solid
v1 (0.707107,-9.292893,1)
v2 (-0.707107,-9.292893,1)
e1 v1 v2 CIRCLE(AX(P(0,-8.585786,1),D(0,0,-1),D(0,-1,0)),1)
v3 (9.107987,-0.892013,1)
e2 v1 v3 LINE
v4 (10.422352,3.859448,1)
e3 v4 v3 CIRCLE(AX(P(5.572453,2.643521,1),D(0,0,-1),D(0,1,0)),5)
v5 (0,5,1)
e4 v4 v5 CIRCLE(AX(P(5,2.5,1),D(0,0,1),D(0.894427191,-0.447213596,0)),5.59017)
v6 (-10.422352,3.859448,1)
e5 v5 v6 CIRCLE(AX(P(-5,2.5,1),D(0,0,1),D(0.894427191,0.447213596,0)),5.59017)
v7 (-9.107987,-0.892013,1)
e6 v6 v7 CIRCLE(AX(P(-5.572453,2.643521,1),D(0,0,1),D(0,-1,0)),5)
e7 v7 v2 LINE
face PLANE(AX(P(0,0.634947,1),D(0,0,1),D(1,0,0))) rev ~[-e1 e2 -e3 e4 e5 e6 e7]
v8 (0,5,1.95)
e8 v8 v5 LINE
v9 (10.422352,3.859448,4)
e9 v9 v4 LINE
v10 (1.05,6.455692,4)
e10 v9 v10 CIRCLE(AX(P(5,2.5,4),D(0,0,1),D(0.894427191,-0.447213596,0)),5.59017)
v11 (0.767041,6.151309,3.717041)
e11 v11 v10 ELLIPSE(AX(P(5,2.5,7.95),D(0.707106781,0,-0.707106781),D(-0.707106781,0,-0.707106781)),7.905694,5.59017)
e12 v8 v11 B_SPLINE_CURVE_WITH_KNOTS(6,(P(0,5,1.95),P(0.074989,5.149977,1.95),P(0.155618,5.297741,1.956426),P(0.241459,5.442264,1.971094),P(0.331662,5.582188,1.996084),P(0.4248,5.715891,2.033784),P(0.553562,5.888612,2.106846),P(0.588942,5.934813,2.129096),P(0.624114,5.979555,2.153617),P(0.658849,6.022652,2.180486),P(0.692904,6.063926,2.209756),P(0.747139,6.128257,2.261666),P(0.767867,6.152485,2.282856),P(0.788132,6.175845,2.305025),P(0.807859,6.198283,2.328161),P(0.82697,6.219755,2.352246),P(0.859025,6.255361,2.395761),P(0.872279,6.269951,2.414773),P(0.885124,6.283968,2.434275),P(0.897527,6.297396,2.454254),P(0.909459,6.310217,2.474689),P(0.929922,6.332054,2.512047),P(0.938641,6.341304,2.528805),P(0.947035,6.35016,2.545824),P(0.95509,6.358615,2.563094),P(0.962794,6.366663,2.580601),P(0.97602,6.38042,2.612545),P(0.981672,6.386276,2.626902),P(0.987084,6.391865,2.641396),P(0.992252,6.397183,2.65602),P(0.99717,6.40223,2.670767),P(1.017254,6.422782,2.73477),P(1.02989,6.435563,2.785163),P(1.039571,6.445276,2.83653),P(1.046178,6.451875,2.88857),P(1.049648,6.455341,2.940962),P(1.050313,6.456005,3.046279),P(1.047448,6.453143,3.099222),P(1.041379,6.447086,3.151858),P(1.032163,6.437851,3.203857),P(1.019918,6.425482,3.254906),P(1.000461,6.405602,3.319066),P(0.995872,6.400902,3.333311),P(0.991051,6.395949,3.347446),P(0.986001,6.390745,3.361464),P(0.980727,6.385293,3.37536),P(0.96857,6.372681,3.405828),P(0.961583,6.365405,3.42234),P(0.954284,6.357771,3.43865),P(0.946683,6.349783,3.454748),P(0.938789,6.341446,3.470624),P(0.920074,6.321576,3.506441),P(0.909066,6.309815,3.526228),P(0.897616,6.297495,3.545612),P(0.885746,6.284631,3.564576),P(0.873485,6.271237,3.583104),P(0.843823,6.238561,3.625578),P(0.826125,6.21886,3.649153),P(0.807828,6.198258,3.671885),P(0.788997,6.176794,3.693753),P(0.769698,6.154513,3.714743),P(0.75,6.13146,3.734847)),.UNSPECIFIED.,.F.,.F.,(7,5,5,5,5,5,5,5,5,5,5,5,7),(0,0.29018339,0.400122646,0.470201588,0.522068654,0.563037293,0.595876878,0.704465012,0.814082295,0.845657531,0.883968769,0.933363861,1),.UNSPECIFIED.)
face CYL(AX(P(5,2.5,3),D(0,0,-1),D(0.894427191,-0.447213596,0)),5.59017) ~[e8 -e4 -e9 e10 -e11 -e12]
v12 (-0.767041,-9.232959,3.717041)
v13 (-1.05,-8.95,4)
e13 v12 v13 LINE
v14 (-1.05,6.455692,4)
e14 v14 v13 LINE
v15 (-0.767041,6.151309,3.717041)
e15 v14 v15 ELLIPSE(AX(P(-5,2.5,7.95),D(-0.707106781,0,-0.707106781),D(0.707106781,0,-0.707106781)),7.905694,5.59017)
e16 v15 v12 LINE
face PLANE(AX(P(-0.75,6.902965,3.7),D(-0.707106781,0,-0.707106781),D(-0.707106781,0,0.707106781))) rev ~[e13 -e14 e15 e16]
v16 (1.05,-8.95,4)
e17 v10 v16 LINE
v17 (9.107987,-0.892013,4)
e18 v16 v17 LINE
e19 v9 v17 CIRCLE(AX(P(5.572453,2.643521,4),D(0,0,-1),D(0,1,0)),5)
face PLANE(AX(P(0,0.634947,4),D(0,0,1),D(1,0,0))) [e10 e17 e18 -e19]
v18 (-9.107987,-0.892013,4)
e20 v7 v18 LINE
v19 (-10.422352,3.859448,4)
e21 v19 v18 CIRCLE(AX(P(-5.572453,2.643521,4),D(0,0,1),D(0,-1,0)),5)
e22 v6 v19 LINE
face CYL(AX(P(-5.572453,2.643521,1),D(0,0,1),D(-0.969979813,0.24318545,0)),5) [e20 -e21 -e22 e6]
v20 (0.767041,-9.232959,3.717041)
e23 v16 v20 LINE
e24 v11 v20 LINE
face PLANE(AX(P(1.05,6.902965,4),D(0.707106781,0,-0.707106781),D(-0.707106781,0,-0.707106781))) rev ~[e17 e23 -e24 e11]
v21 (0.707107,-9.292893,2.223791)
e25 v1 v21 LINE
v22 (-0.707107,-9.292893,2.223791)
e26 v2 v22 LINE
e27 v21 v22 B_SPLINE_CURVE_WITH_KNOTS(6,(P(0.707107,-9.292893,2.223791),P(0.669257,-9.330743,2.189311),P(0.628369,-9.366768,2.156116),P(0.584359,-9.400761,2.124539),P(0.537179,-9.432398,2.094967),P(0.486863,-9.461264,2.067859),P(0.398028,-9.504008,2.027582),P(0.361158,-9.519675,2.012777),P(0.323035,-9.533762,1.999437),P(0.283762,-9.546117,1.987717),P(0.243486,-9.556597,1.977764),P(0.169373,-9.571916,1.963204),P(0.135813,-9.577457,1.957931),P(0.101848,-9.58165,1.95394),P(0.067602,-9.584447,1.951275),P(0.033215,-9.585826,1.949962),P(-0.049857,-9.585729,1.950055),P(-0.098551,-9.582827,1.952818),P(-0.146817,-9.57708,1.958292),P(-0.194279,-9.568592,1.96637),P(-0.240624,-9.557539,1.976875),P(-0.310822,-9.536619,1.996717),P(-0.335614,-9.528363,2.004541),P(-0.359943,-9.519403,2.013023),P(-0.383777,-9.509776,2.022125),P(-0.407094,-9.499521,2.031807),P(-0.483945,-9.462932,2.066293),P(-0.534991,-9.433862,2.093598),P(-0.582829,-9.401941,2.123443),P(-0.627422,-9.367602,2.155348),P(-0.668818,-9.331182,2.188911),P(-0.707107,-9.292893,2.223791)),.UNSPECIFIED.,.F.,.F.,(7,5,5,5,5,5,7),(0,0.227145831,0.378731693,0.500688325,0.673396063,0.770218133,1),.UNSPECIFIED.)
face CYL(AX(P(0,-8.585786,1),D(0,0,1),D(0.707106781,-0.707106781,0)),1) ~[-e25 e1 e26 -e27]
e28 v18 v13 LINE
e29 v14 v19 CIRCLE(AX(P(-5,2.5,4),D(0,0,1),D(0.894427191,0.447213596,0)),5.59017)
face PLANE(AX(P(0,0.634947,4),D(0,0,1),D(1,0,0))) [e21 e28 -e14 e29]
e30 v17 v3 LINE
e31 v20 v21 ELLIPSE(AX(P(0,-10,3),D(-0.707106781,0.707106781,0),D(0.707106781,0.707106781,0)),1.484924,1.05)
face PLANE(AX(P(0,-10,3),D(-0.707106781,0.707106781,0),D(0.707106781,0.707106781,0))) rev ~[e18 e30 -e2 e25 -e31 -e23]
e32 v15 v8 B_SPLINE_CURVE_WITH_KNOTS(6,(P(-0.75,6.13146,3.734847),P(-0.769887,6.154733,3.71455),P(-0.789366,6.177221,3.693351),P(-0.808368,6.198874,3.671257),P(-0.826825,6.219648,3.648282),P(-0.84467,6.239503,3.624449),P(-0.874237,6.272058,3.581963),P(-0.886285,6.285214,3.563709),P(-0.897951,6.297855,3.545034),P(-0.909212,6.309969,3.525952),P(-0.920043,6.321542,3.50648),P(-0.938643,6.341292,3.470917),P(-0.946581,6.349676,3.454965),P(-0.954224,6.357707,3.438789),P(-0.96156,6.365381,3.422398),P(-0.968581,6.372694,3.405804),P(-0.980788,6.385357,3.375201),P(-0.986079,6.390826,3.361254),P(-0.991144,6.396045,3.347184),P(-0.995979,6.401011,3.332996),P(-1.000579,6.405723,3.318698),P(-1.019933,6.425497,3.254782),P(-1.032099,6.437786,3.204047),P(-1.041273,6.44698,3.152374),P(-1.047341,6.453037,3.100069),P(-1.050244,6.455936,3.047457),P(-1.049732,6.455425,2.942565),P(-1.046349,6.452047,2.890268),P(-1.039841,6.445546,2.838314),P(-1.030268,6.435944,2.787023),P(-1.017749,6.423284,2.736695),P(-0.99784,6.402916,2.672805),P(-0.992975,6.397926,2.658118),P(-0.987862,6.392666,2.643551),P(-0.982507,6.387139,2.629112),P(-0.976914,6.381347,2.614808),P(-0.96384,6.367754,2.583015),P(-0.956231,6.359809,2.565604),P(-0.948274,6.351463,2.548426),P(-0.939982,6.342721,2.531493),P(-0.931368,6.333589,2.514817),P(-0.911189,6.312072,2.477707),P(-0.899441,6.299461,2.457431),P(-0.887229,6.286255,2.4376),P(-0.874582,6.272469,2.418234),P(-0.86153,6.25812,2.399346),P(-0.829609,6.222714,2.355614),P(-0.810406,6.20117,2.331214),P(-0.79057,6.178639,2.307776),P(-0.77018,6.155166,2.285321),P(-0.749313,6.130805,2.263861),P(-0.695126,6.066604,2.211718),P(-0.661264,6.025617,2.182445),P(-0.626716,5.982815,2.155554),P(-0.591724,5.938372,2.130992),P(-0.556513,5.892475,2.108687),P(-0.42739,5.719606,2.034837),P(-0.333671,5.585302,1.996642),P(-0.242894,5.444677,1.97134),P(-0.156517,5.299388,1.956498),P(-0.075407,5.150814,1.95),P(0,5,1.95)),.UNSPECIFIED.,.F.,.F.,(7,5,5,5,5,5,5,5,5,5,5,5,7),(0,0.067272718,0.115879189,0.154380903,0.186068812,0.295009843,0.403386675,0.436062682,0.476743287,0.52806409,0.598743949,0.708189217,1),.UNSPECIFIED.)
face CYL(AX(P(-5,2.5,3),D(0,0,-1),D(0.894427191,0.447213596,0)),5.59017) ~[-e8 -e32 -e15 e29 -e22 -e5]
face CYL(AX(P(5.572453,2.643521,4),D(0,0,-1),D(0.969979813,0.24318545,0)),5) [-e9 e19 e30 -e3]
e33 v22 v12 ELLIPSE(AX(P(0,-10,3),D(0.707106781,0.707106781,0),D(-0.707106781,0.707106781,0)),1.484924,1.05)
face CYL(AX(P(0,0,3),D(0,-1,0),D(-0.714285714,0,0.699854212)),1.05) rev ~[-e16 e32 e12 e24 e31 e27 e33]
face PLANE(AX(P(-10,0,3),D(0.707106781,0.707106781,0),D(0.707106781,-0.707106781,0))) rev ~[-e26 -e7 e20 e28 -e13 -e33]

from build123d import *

# Parameters (mm, degrees)
F1_DEPTH      = 3
F2_W          = 4
F2_H          = 6.1803398875
F3_DEPTH      = 1
F5_DEPTH      = 8.0911699437
F5_DEPTH_BACK = 10.001
F6_T1_DEPTH   = 16.9244695544
F7_DEPTH      = 1
F8_R          = 5
F9_R          = 1


# Not quite as in the source:
# - a fillet or chamfer that OpenCascade refuses, or shapes differently, is made with other operations: its cross-section is extruded or revolved along the edge and cut away or added


with BuildPart() as f1:
    # F0 (on Top) → F1 (new body)
    with BuildSketch(Plane.XY):
        with BuildLine():
            ThreePointArc((10, 0), (7.5, 7.5), (0, 5))
            ThreePointArc((0, 5), (-7.5, 7.5), (-10, 0))
            Line((-10, 0), (0, -10))
            Line((0, -10), (10, 0))
        make_face()
    extrude(amount=F1_DEPTH)

    # F2 (on face) → F3 (join)
    with BuildSketch(Plane.XY.offset(3)):
        with BuildLine():
            ThreePointArc((0, 5), (-7.5, 7.5), (-10, 0))
            Line((-10, 0), (0, -10))
            Line((0, -10), (10, 0))
            ThreePointArc((10, 0), (7.5, 7.5), (0, 5))
        make_face()
        Rectangle(F2_W, F2_H, mode=Mode.SUBTRACT)
        Rectangle(F2_W, F2_H)
    extrude(amount=F3_DEPTH)

    # F4 (on Front) → F5 (cut, two sides)
    with BuildSketch(Plane.XZ) as f5_sk:
        with BuildLine():
            Line((0.75, 4), (-0.75, 4))
            Line((-0.75, 4), (-0.75, 3.7348469228))
            ThreePointArc((-0.75, 3.7348469228), (0, 1.95), (0.75, 3.7348469228))
            Line((0.75, 3.7348469228), (0.75, 4))
        make_face()
    extrude(amount=-F5_DEPTH, mode=Mode.SUBTRACT)
    extrude(f5_sk.sketch, amount=F5_DEPTH_BACK, mode=Mode.SUBTRACT)

    # F6: chamfer of 0.3 on 2 edges, made by hand

    # F6_s2 → F6_t1 (cut)
    with BuildSketch(Plane.XZ.offset(-6.902964658)):
        Polygon((1.05, 4), (0.75, 3.7), (0.75, 4), align=None)
        Polygon((-0.75, 3.7), (-1.05, 4), (-0.75, 4), align=None)
    extrude(amount=F6_T1_DEPTH, mode=Mode.SUBTRACT)

    # F7 (cut): a face of the model
    f7_faces = [f1.faces().sort_by_distance(p)[0] for p in [
        (0, 0.8210756438, 0),
    ]]
    extrude(f7_faces, amount=-F7_DEPTH, mode=Mode.SUBTRACT)

    # F8
    f8_edges = [f1.edges().sort_by_distance(p)[0] for p in [
        (10, 0, 2.5),
        (-10, 0, 2.5),
    ]]
    fillet(f8_edges, radius=F8_R)

    # F9
    f9_edges = [f1.edges().sort_by_distance(p)[0] for p in [
        (0, -10, 1.475),
    ]]
    fillet(f9_edges, radius=F9_R)


solid = f1.part
